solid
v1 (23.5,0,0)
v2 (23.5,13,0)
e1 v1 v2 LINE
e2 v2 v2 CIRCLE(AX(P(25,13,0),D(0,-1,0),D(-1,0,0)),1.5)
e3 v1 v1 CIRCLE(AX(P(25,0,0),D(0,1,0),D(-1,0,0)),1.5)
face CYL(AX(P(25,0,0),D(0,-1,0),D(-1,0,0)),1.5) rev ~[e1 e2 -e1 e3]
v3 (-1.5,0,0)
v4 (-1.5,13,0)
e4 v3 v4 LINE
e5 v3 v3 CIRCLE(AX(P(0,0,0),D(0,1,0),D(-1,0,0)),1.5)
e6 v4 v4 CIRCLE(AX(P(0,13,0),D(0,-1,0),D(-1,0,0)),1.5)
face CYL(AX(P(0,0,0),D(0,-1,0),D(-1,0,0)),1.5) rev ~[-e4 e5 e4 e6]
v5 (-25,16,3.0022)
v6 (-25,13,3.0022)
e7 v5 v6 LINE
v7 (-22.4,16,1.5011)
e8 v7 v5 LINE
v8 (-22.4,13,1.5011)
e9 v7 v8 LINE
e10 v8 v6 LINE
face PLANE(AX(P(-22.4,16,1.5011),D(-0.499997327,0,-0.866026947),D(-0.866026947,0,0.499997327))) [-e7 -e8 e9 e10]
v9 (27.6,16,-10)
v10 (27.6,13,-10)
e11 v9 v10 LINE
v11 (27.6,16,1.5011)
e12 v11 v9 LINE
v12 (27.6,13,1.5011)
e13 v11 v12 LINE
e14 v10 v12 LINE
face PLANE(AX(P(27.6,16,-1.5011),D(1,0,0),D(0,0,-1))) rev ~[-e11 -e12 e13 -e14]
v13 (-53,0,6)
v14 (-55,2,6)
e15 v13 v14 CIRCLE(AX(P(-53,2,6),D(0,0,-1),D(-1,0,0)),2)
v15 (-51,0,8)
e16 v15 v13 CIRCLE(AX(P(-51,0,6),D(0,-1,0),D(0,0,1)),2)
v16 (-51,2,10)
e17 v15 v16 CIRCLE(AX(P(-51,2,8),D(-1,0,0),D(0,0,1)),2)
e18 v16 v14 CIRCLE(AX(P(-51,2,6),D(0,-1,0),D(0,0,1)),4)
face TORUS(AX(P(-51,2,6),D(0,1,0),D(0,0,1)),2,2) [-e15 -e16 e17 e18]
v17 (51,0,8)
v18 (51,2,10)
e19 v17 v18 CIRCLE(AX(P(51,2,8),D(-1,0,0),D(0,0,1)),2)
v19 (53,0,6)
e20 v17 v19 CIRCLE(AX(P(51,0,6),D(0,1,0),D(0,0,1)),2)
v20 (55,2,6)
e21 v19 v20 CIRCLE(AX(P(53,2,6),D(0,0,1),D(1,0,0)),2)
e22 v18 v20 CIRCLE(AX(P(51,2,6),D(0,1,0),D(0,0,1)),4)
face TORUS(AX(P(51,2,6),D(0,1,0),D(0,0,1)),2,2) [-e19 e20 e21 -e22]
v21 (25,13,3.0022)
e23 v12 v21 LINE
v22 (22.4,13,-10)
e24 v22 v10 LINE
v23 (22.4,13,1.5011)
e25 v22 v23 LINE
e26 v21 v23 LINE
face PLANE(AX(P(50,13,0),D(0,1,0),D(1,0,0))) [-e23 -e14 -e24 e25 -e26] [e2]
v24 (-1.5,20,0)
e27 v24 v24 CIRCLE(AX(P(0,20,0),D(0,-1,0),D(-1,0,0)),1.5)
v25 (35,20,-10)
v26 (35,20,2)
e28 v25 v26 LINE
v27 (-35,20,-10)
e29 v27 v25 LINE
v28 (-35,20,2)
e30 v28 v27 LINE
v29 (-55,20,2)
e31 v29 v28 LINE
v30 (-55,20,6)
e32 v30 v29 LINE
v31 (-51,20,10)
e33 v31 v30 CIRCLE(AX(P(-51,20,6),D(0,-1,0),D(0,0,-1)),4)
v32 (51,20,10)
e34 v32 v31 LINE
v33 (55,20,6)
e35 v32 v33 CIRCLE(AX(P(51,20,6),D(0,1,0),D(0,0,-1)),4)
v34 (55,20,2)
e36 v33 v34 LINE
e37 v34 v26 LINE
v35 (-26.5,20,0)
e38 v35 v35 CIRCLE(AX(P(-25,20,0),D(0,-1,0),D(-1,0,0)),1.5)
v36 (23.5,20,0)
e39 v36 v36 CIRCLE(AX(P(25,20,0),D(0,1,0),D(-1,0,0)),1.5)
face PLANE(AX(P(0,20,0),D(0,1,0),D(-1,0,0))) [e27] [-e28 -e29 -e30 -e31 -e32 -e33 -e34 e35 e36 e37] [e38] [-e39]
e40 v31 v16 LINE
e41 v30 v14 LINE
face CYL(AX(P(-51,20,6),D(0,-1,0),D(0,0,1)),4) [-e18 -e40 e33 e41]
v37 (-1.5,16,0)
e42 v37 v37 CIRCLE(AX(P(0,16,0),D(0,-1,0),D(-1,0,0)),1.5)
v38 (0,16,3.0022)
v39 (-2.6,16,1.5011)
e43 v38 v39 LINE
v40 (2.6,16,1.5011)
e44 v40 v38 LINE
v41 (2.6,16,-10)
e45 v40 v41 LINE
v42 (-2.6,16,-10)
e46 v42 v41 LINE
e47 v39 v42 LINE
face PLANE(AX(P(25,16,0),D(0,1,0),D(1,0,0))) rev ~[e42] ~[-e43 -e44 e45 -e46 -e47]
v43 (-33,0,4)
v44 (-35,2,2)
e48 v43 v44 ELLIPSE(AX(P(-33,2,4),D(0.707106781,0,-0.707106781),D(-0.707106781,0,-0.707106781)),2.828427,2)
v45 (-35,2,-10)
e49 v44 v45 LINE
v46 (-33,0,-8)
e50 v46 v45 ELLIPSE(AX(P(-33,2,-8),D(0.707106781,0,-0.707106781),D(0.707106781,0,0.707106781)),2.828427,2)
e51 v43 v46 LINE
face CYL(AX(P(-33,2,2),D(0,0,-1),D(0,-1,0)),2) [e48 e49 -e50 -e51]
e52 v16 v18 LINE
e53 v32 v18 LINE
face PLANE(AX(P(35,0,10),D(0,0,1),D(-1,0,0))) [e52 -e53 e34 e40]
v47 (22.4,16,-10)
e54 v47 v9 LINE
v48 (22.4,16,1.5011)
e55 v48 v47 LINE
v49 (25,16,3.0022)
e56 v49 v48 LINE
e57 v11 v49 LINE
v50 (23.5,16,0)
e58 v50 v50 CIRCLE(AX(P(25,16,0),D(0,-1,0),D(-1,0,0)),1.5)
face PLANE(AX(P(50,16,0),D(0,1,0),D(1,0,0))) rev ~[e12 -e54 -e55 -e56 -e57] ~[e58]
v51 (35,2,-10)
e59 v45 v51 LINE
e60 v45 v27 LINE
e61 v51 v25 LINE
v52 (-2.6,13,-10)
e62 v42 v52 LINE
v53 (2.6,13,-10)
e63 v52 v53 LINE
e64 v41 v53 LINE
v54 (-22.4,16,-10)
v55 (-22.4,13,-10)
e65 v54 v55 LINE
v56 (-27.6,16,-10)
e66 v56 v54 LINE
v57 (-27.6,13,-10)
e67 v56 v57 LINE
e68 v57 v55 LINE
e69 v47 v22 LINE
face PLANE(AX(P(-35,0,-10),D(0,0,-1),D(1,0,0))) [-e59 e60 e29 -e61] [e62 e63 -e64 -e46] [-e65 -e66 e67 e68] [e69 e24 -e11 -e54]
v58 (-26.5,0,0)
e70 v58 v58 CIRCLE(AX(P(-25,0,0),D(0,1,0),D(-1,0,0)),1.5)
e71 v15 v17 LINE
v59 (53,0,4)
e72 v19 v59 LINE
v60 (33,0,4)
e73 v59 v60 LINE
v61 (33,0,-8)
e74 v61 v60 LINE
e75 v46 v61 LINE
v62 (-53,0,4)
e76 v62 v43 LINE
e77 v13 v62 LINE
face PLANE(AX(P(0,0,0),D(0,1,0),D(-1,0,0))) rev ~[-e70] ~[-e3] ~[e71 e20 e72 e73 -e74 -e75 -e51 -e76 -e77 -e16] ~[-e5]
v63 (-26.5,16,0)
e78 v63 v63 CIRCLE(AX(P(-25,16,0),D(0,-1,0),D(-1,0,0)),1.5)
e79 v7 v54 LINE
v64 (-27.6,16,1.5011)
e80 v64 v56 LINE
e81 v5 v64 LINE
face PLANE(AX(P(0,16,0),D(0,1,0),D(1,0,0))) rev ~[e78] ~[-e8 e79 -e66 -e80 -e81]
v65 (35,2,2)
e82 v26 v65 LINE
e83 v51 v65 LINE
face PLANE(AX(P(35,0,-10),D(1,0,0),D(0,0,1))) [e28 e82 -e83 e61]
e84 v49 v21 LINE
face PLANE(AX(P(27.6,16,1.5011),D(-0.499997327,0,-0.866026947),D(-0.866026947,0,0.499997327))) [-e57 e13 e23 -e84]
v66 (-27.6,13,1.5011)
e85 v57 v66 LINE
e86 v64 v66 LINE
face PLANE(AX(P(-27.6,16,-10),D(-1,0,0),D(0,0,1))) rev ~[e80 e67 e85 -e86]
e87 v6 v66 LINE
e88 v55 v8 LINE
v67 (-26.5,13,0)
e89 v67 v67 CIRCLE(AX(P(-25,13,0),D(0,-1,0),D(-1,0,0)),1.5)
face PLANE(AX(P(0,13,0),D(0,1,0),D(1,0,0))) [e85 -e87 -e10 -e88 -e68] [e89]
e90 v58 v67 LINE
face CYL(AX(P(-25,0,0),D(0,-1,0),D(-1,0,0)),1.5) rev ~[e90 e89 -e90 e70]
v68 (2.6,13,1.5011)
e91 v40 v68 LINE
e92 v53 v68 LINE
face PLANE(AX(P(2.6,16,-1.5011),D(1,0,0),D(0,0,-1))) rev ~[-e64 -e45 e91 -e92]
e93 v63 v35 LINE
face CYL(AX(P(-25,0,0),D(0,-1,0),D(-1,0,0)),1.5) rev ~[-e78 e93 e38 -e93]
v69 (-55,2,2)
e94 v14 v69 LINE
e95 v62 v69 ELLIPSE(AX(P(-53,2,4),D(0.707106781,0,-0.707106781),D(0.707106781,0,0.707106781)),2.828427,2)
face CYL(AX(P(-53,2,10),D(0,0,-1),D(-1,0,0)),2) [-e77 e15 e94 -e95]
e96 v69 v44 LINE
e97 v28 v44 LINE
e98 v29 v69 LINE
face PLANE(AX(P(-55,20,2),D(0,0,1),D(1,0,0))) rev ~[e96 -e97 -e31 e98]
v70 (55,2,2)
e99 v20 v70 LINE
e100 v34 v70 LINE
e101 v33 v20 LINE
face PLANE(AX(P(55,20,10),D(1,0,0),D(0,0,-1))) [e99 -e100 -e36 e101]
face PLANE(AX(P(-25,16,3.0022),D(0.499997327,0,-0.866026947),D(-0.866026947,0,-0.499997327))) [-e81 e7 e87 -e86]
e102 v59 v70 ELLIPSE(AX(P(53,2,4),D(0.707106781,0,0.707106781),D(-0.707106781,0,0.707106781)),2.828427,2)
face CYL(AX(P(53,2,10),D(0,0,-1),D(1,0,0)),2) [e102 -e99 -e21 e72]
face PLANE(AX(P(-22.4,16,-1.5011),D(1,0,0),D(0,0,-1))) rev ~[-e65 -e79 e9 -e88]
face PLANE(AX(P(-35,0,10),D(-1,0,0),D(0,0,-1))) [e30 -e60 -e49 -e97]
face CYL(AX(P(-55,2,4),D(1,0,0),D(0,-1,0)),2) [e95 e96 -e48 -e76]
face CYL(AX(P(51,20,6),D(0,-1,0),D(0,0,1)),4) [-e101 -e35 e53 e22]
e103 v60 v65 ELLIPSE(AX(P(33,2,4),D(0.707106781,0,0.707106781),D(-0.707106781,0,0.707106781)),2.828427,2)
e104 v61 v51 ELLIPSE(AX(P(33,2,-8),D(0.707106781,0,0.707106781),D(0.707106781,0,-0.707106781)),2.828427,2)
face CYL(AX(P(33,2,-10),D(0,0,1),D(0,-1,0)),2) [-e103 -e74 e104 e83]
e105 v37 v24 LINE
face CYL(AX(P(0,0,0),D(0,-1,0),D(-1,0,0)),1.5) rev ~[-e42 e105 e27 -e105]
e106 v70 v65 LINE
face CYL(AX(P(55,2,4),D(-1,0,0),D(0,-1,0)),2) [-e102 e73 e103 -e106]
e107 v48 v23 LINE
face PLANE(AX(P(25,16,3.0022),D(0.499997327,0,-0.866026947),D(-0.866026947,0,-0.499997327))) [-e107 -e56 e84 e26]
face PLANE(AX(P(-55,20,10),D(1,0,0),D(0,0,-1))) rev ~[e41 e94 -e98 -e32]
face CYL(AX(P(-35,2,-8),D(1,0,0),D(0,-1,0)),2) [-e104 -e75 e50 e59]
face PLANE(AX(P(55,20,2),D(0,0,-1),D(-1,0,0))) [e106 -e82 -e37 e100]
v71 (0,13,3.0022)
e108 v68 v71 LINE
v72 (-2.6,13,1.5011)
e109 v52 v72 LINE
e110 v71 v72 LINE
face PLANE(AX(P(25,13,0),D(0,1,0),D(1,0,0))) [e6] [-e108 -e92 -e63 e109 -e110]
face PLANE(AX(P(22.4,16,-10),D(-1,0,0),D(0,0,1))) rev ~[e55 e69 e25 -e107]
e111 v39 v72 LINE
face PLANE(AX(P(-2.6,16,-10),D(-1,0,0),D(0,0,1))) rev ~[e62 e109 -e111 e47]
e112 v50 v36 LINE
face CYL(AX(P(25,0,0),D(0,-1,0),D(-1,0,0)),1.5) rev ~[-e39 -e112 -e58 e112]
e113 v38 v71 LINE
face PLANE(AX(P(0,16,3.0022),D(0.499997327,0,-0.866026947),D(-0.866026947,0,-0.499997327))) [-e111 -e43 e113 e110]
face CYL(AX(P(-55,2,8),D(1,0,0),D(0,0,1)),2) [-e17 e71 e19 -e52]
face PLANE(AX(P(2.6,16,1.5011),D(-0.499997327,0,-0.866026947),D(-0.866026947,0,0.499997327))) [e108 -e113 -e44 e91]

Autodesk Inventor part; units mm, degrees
ref_plane "YZ Plane" through (0, 0, 0) normal (1, 0, 0) x (0, 1, 0)
ref_plane "XZ Plane" through (0, 0, 0) normal (0, 1, 0) x (-1, 0, 0)
sketch "Sketch1" plane through (0, 0, 0) normal (0, 1, 0) x (-1, 0, 0)
  line L0 (-35, 10) -> (35, 10)
  line L1 (35, 10) -> (35, -10)
  line L2 (35, -10) -> (-35, -10)
  line L3 (-35, -10) -> (-35, 10)
  line L4 (-35, 10) -> (35, -10) construction
  line L5 (35, 10) -> (-35, -10) construction
  line L6 (0, 0) -> (25, 0)
  line L7 (0, 0) -> (-25, 0)
  circle A0 centre (25, 0) radius 1.5
  circle A1 centre (-25, 0) radius 1.5
  circle A2 centre (0, 0) radius 1.5
  dimension "d0" = 70
  dimension "d1" = 20
  dimension "d2" = 25
  dimension "d3" = 25
  dimension "d4" = 3
  dimension "d5" = 3
  dimension "d8" = 3
extrude "Extrusion1" add sketch "Sketch1" along normal blind 20
sketch "Sketch2" plane through (0, 20, 0) normal (0, 1, 0) x (1, 0, 0)
  circle A0 centre (0, 0) radius 1.5 projected
  circle A1 centre (25, 0) radius 1.5 projected
  circle A2 centre (-25, 0) radius 1.5 projected
  line L0 (-35, -10) -> (35, -10) projected
  line L1 (35, -10) -> (35, 10) projected
  line L2 (35, 10) -> (-35, 10) projected
  line L3 (-35, 10) -> (-35, -10) projected
  line L4 (-35, 10) -> (-35, -10) projected
  line L5 (-35, -10) -> (-55, -10)
  line L6 (-55, -10) -> (-55, -2)
  line L7 (-55, -2) -> (-35, -2)
  line L8 (-35, -2) -> (-35, -10)
  line L9 (35, -10) -> (55, -10)
  line L10 (55, -10) -> (55, -2)
  line L11 (55, -2) -> (35, -2)
  line L12 (35, -2) -> (35, -10)
  dimension "d9" = 20
  dimension "d10" = 8
  dimension "d11" = 20
  dimension "d12" = 8
extrude "Extrusion2" add sketch "Sketch2" against normal up to surface (20 mm away) contours L5 L6 L7 L3 | L1 L11 L10 L9
ref_plane "Work Plane1" through (0, 16, 0) normal (0, 1, 0) x (1, 0, 0)
sketch "Sketch3" plane through (0, 16, 0) normal (0, 1, 0) x (1, 0, 0)
  circle A0 centre (0, 0) radius 1.5 construction
  circle A1 centre (25, 0) radius 1.5 construction
  circle A2 centre (-25, 0) radius 1.5 construction
  line L0 (-55, -10) -> (55, -10) construction
  line L1 (55, -10) -> (55, -2) construction
  line L2 (55, -2) -> (35, -2) construction
  line L3 (35, -2) -> (35, 10) construction
  line L4 (35, 10) -> (-35, 10) construction
  line L5 (-35, 10) -> (-35, -2) construction
  line L6 (-35, -2) -> (-55, -2) construction
  line L7 (-55, -2) -> (-55, -10) construction
  circle A3 centre (-25, 0) radius 1.5 construction
  line L8 (-25, 0) -> (-27.6, 0) construction
  line L9 (-27.6, 1.5011) -> (-25, 3.0022)
  line L10 (-25, 3.0022) -> (-22.4, 1.5011)
  line L11 (-22.4, 1.5011) -> (-22.4, -1.5011)
  line L12 (-22.4, -1.5011) -> (-25, -3.0022)
  line L13 (-25, -3.0022) -> (-27.6, -1.5011)
  line L14 (-27.6, -1.5011) -> (-27.6, 1.5011)
  line L15 (-35, 10) -> (35, 10) projected
  line L16 (-27.6, 1.5011) -> (-22.4, 1.5011)
  line L17 (-22.4, 1.5011) -> (-22.4, 10)
  line L18 (-22.4, 10) -> (-27.6, 10)
  line L19 (-27.6, 10) -> (-27.6, 1.5011)
  dimension "d17" = 2.6
extrude "Extrusion3" cut sketch "Sketch3" against normal blind 3
pattern_linear "Rectangular Pattern1" count 3 spacing 25 along (1, 0, 0) of "Extrusion3"
fillet "Fillet1" radius 2 8 edges at (0, 0, 10) (0, 0, -10) (-35, 0, -4) (-45, 0, 2) (-55, 0, 6) (35, 0, -4) (45, 0, 2) (55, 0, 6)
fillet "Fillet1" radius 4 2 edges at (55, 10, 10) (-55, 10, 10)
properties part number "foot_front"
